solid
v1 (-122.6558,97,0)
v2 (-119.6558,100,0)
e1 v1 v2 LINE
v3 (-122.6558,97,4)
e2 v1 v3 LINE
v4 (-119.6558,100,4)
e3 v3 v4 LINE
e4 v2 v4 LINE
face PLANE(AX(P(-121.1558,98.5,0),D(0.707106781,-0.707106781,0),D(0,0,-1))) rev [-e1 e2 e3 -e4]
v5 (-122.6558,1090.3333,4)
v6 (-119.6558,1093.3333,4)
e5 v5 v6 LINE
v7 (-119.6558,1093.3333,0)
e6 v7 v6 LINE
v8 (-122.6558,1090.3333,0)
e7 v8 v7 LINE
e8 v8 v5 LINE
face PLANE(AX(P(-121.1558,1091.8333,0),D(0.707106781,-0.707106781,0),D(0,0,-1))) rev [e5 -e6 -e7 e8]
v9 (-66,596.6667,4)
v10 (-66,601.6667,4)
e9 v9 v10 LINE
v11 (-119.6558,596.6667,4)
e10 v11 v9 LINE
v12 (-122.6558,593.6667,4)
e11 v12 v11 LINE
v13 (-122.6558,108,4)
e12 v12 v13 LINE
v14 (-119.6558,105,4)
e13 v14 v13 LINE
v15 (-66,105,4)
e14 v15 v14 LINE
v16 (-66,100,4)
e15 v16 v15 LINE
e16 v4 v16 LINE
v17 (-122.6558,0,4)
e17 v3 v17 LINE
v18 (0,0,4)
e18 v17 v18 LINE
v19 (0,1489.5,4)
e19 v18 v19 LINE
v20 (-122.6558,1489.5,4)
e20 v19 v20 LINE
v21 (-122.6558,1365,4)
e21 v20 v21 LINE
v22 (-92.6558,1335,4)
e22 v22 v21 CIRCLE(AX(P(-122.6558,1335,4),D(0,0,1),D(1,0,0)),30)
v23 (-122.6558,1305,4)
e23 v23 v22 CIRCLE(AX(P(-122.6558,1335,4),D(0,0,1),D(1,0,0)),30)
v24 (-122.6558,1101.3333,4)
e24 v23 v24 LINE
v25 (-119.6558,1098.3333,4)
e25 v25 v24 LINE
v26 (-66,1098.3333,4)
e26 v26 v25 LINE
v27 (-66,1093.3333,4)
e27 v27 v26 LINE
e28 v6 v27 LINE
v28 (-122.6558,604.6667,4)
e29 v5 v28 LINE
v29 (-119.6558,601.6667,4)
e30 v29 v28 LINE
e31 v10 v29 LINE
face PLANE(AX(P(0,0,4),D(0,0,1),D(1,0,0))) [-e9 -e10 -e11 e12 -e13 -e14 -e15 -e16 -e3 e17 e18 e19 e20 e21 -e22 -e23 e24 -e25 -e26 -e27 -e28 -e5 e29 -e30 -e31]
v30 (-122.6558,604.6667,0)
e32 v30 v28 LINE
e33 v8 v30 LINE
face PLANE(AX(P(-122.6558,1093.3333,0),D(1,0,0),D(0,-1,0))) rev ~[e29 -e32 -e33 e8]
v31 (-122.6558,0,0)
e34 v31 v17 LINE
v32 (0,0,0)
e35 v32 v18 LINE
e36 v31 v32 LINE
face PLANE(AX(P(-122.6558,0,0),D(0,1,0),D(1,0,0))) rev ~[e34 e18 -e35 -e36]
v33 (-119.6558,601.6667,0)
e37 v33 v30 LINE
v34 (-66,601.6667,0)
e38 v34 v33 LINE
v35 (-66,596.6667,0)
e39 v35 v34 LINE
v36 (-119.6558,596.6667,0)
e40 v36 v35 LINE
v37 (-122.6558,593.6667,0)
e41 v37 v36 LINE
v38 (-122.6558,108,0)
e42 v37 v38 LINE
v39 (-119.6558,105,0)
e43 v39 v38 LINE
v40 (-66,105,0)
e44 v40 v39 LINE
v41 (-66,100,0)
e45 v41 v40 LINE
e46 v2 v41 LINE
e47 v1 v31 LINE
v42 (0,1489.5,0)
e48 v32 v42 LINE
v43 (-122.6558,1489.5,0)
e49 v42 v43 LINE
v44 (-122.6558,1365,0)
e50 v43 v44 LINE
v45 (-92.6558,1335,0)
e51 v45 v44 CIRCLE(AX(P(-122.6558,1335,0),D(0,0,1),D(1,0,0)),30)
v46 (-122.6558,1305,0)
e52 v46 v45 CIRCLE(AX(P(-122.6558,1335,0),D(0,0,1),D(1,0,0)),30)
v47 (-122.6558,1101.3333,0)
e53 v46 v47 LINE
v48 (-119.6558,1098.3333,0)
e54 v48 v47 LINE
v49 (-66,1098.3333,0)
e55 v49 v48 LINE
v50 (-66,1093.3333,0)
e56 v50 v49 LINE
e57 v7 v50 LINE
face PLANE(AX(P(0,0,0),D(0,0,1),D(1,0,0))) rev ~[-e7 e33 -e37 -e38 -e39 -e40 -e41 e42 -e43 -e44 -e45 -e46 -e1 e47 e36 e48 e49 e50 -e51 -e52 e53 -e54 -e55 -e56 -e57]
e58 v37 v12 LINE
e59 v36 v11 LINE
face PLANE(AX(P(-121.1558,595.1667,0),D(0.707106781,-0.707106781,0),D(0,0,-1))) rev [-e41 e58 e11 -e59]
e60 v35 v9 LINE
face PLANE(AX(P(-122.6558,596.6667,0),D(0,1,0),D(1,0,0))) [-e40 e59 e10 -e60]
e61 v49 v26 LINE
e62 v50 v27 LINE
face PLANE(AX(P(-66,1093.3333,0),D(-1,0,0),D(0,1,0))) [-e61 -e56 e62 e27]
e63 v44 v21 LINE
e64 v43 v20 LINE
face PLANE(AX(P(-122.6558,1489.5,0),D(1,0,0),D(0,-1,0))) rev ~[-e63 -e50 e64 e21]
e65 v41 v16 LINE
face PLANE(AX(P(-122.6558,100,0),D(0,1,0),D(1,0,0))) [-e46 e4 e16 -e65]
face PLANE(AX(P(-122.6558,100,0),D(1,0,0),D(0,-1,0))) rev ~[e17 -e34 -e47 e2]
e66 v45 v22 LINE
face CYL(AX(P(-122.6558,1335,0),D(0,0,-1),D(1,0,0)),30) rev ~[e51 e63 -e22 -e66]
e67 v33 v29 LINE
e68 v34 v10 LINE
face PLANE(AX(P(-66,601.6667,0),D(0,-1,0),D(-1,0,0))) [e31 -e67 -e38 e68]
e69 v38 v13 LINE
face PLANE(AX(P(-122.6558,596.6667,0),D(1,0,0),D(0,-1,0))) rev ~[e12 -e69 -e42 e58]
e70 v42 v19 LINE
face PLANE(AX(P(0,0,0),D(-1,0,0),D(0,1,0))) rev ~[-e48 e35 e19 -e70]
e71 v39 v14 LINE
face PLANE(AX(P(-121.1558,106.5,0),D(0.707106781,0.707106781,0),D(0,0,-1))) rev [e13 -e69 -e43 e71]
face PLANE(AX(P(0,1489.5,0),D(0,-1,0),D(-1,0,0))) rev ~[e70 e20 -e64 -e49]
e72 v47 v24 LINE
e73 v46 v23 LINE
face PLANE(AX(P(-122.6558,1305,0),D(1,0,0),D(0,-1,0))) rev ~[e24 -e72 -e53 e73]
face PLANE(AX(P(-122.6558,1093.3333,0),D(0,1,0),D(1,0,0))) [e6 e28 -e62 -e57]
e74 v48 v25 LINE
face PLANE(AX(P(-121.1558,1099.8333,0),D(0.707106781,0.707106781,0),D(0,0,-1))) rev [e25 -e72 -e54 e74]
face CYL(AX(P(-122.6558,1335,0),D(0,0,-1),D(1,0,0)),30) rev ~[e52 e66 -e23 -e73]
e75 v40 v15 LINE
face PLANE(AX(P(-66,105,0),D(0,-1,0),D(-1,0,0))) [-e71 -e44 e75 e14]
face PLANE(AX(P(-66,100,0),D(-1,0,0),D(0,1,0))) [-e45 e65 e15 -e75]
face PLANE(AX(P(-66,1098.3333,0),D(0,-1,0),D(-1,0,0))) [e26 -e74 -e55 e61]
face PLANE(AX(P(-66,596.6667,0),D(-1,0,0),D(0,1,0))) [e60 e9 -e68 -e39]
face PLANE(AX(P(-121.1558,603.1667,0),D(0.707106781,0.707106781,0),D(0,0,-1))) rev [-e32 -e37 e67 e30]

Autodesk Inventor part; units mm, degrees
ref_plane "YZ Plane" through (0, 0, 0) normal (1, 0, 0) x (0, 1, 0)
ref_plane "XZ Plane" through (0, 0, 0) normal (0, 1, 0) x (-1, 0, 0)
ref_plane "XY Plane" through (0, 0, 0) normal (0, 0, 1) x (1, 0, 0)
sketch "Sketch1" plane through (0, 0, 0) normal (0, 0, 1) x (1, 0, 0)
  line L0 (0, 1489.5) -> (-122.6558, 1489.5)
  line L1 (-122.6558, 1489.5) -> (-122.6558, 0)
  line L2 (-122.6558, 0) -> (0, 0)
  line L3 (0, 0) -> (0, 1489.5)
  line L4 (-122.6558, 100) -> (-66, 100)
  line L5 (-66, 100) -> (-66, 105)
  line L6 (-66, 105) -> (-122.6558, 105)
  line L7 (-122.6558, 105) -> (-122.6558, 100)
  line L8 (-122.6558, 596.6667) -> (-66, 596.6667)
  line L9 (-66, 596.6667) -> (-66, 601.6667)
  line L10 (-66, 601.6667) -> (-122.6558, 601.6667)
  line L11 (-122.6558, 601.6667) -> (-122.6558, 596.6667)
  line L12 (-122.6558, 1093.3333) -> (-66, 1093.3333)
  line L13 (-66, 1093.3333) -> (-66, 1098.3333)
  line L14 (-66, 1098.3333) -> (-122.6558, 1098.3333)
  line L15 (-122.6558, 1098.3333) -> (-122.6558, 1093.3333)
  circle A0 centre (-122.6558, 1335) radius 30
  point P0 (-122.6558, 601.6667)
  point P1 (-122.6558, 1365)
  point P2 (-122.6558, 1305)
  dimension "d0" = 1489.5
  dimension "d1" = 122.6559
  dimension "d2" = 5
  dimension "d4" = 100
  dimension "d7" = 496.6667
  dimension "d23" = 66
  dimension "d29" = 60
  dimension "d30" = 1335
extrude "Plate1" add sketch "Sketch1" along normal blind 4 contours L3 L2 L1 L4 L5 L6 L8 L9 L10 L12 L13 L14 A0 L0
chamfer "Corner Chamfer1" distance 3 angle 45 6 edges at (-122.6558, 100, 2) (-122.6558, 105, 2) (-122.6558, 596.6667, 2) (-122.6558, 601.6667, 2) (-122.6558, 1098.3333, 2) (-122.6558, 1093.3333, 2)
equation "\"d0\" = Стрингер_длина"
equation "\"d1\" = стрингер_глубина_7"
equation "\"d2\" = паз_под_стрингер_толщина"
equation "\"d7\" = Шаг_шпангоутов"
equation "\"d23\" = паз_под_стрингер_глубина - Thickness"
equation "\"d29\" = 2 * радиус_выреза_под_сварку"
equation "\"d12\" = Thickness"
equation "\"BendRadius\" = Thickness"
equation "\"BendReliefWidth\" = Thickness"
equation "\"BendReliefDepth\" = 0.5 * Thickness"
equation "\"CornerReliefSize\" = 4 * Thickness"
equation "\"MinimumRemnant\" = 2 * Thickness"
equation "\"TransitionRadius\" = BendRadius"
equation "\"JacobiRadiusSize\" = BendRadius"
equation "\"GapSize\" = Thickness"
equation "\"Стрингер_длина\" = 1489.5"
equation "\"стрингер_глубина_7\" = 122.65585"
equation "\"паз_под_стрингер_толщина\" = 5"
equation "\"Шаг_шпангоутов\" = 496.666667"
equation "\"паз_под_стрингер_глубина\" = 70"
equation "\"Thickness\" = 4"
equation "\"радиус_выреза_под_сварку\" = 30"
properties part number "GBK 3312 stringer 7" material "Steel"
